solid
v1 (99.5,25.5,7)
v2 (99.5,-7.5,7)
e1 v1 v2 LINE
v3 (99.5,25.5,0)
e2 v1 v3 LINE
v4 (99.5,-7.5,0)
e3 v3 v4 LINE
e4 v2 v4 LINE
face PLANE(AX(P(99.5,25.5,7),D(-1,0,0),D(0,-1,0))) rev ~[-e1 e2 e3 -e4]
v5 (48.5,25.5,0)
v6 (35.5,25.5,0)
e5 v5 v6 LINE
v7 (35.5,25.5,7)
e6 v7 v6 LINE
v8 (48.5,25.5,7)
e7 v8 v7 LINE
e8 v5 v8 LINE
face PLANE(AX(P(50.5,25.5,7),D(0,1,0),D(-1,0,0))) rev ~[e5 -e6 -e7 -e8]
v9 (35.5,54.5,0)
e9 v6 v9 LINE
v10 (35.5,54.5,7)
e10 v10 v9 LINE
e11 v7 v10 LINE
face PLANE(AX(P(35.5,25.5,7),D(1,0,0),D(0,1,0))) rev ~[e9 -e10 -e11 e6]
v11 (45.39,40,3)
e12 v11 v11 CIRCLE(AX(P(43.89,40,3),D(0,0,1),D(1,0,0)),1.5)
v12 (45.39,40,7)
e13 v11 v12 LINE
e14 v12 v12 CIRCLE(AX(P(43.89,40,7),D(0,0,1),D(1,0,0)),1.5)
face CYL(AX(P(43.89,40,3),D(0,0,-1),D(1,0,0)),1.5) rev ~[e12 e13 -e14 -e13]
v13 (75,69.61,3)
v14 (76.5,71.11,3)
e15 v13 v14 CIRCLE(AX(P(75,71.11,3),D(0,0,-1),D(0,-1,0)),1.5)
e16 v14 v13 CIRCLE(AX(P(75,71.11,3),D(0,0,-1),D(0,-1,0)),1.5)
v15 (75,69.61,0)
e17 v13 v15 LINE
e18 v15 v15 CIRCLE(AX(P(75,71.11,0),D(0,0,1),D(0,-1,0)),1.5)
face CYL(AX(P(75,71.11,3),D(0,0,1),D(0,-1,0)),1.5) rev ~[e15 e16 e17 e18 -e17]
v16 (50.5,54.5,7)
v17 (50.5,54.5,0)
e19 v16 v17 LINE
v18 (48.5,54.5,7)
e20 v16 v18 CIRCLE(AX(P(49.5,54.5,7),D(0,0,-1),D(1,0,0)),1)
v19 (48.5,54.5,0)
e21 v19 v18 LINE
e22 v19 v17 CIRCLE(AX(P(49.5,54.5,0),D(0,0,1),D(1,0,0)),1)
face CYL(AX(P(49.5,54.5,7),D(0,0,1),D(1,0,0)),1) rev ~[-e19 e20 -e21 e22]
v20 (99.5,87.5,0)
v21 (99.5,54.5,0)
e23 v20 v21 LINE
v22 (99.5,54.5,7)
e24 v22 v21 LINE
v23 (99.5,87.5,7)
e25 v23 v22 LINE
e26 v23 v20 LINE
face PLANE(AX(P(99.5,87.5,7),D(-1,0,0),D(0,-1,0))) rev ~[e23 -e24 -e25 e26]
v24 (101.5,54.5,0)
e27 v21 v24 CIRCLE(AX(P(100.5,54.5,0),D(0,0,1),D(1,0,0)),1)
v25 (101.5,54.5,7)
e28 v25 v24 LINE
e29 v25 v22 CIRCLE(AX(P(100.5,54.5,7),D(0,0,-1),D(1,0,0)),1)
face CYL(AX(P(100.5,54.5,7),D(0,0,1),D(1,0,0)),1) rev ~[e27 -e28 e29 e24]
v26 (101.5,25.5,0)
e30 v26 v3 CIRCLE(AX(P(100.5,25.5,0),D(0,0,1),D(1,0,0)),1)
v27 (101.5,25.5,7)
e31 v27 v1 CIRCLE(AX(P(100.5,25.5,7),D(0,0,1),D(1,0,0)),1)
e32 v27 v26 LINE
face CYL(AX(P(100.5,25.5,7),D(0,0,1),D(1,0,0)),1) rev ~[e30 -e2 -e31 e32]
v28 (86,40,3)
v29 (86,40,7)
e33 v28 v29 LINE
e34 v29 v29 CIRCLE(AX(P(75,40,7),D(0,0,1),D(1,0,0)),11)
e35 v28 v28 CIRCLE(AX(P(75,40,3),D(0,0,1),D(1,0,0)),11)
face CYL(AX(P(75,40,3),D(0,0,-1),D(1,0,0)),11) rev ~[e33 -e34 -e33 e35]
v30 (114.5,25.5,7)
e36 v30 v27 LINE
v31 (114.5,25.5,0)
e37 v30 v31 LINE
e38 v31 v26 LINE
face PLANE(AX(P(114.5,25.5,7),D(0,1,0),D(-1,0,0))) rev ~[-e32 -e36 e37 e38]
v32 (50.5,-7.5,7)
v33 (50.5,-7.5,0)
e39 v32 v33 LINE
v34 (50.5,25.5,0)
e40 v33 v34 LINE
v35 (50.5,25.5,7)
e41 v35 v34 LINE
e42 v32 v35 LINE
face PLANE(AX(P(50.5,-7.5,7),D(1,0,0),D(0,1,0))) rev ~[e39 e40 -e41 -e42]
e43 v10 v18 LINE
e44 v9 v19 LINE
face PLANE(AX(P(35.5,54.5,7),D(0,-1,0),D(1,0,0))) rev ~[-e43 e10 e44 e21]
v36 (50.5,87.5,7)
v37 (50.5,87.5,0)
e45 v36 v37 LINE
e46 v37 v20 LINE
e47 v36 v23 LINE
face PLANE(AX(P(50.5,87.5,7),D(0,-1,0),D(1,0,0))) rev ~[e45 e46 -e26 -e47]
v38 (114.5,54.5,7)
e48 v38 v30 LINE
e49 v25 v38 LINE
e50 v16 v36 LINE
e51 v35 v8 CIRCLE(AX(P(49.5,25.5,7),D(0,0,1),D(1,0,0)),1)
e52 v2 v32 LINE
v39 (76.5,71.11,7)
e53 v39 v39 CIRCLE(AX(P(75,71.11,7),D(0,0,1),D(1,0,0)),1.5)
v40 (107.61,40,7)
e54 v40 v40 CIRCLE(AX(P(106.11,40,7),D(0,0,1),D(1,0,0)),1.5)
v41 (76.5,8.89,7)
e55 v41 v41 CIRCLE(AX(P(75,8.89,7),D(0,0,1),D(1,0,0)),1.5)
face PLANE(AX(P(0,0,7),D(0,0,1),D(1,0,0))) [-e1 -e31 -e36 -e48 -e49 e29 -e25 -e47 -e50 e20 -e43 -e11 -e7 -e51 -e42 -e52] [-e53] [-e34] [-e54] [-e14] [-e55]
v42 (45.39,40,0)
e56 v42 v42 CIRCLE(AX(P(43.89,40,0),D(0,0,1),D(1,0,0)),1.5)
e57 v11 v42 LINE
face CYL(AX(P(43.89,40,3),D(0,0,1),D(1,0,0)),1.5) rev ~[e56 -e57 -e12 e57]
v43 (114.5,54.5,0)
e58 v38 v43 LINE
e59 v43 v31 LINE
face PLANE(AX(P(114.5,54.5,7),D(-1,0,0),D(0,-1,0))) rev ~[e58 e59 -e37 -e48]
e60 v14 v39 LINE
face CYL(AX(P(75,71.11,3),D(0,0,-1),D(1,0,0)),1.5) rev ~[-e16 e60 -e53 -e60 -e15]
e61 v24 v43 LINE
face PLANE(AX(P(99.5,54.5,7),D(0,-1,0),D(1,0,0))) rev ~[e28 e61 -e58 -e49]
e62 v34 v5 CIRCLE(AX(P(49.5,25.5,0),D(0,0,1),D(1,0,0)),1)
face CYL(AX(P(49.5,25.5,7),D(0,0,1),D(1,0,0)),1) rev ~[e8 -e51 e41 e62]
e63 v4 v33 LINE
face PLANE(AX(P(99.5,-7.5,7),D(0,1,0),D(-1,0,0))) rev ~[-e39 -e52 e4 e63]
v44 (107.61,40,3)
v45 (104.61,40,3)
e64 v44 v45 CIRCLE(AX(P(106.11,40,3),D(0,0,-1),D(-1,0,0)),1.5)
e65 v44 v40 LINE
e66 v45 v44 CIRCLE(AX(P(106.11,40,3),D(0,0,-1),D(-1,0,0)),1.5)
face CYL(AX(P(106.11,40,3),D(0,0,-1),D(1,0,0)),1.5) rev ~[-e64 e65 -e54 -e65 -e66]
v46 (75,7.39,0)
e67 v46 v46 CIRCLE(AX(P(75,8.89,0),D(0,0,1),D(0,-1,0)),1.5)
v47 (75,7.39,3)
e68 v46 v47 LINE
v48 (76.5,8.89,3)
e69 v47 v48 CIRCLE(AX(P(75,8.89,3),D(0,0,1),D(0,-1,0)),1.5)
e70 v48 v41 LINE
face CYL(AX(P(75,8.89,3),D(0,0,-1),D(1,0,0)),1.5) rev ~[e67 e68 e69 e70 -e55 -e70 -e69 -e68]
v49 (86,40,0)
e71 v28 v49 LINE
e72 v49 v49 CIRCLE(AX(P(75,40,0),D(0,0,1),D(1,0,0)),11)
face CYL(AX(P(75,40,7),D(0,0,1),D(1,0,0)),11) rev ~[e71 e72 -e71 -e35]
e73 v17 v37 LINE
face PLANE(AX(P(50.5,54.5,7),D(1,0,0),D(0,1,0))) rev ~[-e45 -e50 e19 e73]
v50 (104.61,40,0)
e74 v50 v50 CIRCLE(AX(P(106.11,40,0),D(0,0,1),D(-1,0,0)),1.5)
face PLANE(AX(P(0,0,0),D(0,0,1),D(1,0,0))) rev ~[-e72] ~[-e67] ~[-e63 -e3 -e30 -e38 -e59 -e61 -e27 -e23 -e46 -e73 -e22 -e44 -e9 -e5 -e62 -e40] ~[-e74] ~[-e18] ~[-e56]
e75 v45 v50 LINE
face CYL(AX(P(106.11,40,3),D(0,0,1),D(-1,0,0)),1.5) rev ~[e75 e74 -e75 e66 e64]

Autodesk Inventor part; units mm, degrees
ref_plane "YZ Plane" through (0, 0, 0) normal (1, 0, 0) x (0, 1, 0)
ref_plane "XZ Plane" through (0, 0, 0) normal (0, 1, 0) x (-1, 0, 0)
ref_plane "XY Plane" through (0, 0, 0) normal (0, 0, 1) x (1, 0, 0)
sketch "Sketch1" plane through (0, 0, 0) normal (0, 0, 1) x (1, 0, 0)
  line L0 (-75, 40) -> (75, 40)
  line L1 (75, 40) -> (75, -40)
  line L2 (75, -40) -> (-75, -40)
  line L3 (-75, -40) -> (-75, 40)
  point P0 (0, 0)
  dimension "d0" = 150
  dimension "d1" = 80
  dimension "d2" = 40
  dimension "d3" = 75
extrude "Vlak" add sketch "Sketch1" along normal blind 3
sketch "Sketch3" plane through (0, 0, 3) normal (0, 0, 1) x (1, 0, 0)
  line L0 (75, 40) -> (75, -40) projected
  line L1 (-75, 40) -> (75, 40) projected
  circle A0 centre (75, 40) radius 10
  point P0 (0, 0)
  dimension "d12" = 20
  dimension "d13" = 0
  dimension "d14" = 0
extrude "Centergat" cut sketch "Sketch3" against normal blind 3
sketch "Sketch4" plane through (0, 0, 3) normal (0, 0, 1) x (1, 0, 0)
  line L0 (-75, 40) -> (65, 40) projected
  line L1 (75, -40) -> (-75, -40) projected
  line L2 (18.8539, 53.8539) -> (-131.8943, -96.8943) construction
  circle A0 centre (-155, -120) radius 150
  point P0 (0, 0)
  dimension "d17" = 0
  dimension "d18" = 45
  dimension "d19" = 300
  dimension "d20" = 0
  dimension "d21" = 160
extrude "PropellorSpace" cut sketch "Sketch4" against normal blind 3
sketch "Sketch5" plane through (0, 0, 3) normal (0, 0, 1) x (1, 0, 0)
  arc A0 (-28.1142, -40) -> (-75, 6.8858) centre (-155, -120) ccw projected
  line L0 (75, -40) -> (-28.1142, -40) projected
  line L1 (-75, 40) -> (65, 40) projected
  line L2 (-155, -120) -> (34.1296, 69.1296) construction
  line L3 (-168.3606, -98.0053) -> (-8.8118, 61.5435) construction
  line L4 (-132.6124, -132.9677) -> (63.849, 63.4937) construction
  line L5 (-208.1378, -57.7825) -> (-104.1378, -161.7825) construction
  line L6 (-25.5995, -23.1264) -> (-11.4573, -8.9842)
  line L7 (-11.4573, -8.9842) -> (-8.6289, -11.8127)
  line L8 (-8.6289, -11.8127) -> (-22.771, -25.9548)
  line L9 (-22.771, -25.9548) -> (-25.5995, -23.1264)
  line L10 (-60.9548, 12.229) -> (-46.8127, 26.3711)
  line L11 (-46.8127, 26.3711) -> (-43.9842, 23.5427)
  line L12 (-43.9842, 23.5427) -> (-58.1264, 9.4005)
  line L13 (-58.1264, 9.4005) -> (-60.9548, 12.229)
  line L14 (13.2914, 15.7645) -> (27.4335, 29.9066)
  line L15 (27.4335, 29.9066) -> (30.262, 27.0782)
  line L16 (30.262, 27.0782) -> (16.1198, 12.9361)
  line L17 (16.1198, 12.9361) -> (13.2914, 15.7645)
  line L18 (-62.0184, 71.663) -> (40.1093, -30.4647) construction
  line L19 (-7.9217, 14.7379) -> (-22.0638, 28.88)
  line L20 (-22.0638, 28.88) -> (-19.2354, 31.7085)
  line L21 (-19.2354, 31.7085) -> (-5.0932, 17.5663)
  line L22 (-5.0932, 17.5663) -> (-7.9217, 14.7379)
  point P0 (0, 0)
  point P1 (-168.1378, -97.7825)
  point P2 (-132.7825, -133.1378)
  point P3 (-30.3553, 40)
  dimension "d24" = 45
  dimension "d25" = 0
  dimension "d26" = 90
  dimension "d27" = 25
  dimension "d28" = 25
  dimension "d29" = 0
  dimension "d30" = 0
  dimension "d31" = 0
  dimension "d32" = 20
  dimension "d33" = 4
  dimension "d34" = 20
  dimension "d35" = 4
  dimension "d36" = 0
  dimension "d37" = 2
  dimension "d38" = 0
  dimension "d39" = 2
  dimension "d40" = 160
  dimension "d41" = 160
  dimension "d44" = 55
  dimension "d49" = 45
  dimension "d50" = 0
  dimension "d51" = 0
  dimension "d52" = 0
  dimension "d53" = 21.2742
  dimension "d54" = 20
  dimension "d55" = 4
  dimension "d56" = 0
  dimension "d57" = 2
  dimension "d58" = 13.726
extrude "Armsteunen" cut sketch "Sketch5" against normal blind 3
sketch "Sketch6" plane through (0, 0, 3) normal (0, 0, 1) x (1, 0, 0)
  line L0 (75, -40) -> (-28.1142, -40) projected
  line L1 (75, 30) -> (75, -40) projected
  line L2 (-75, 40) -> (65, 40) projected
  line L3 (-75, 6.8858) -> (-75, 40) projected
  circle A0 centre (55, -20) radius 1.5
  circle A1 centre (15, -20) radius 1.5
  circle A2 centre (-13.9878, -20) radius 1.5
  circle A3 centre (-34.4939, 0.5061) radius 1.5
  circle A4 centre (43.89, 40) radius 1.5
  circle A5 centre (26.0122, 20) radius 1.5
  circle A6 centre (5, 40) radius 1.5
  circle A7 centre (-55, 21.0122) radius 1.5
  circle A8 centre (-55, 30) radius 1.5
  line L4 (-55, 21.0122) -> (-13.9878, -20) construction
  line L5 (-34.4939, 0.5061) -> (12.7873, 47.7873) construction
  circle A9 centre (-40.4428, 35) radius 1.5
  circle A10 centre (3.6899, -2.3223) radius 1.5
  circle A11 centre (-16.8162, 18.1838) radius 1.5
  arc A12 (65, 40) -> (75, 30) centre (75, 40) ccw projected
  circle A13 centre (75, 8.89) radius 1.5
  point P0 (0, 0)
  point P1 (-43.9842, 23.5427)
  point P2 (-11.4573, -8.9842)
  dimension "d61" = 3
  dimension "d62" = 3
  dimension "d63" = 3
  dimension "d64" = 3
  dimension "d65" = 3
  dimension "d66" = 3
  dimension "d67" = 3
  dimension "d68" = 3
  dimension "d69" = 3
  dimension "d70" = 20
  dimension "d71" = 20
  dimension "d72" = 20
  dimension "d73" = 60
  dimension "d75" = 20
  dimension "d76" = 31.11
  dimension "d77" = 0
  dimension "d78" = 20
  dimension "d80" = 10
  dimension "d82" = 20
  dimension "d83" = 20
  dimension "d84" = 0
  dimension "d87" = 45
  dimension "d88" = 0
  dimension "d89" = 0
  dimension "d90" = 3
  dimension "d101" = 3
  dimension "d103" = 29
  dimension "d106" = 3
  dimension "d107" = 0
  dimension "d111" = 3
  dimension "d112" = 0
  dimension "d113" = 31.11
  dimension "d166" = 29
  dimension "d167" = 23
  dimension "d168" = 23
  dimension "d169" = 29
  dimension "d170" = 25
  dimension "d171" = 25
  dimension "d172" = 29
  dimension "d175" = 29
  dimension "d179" = 5
  dimension "d182" = 43.9962
extrude "Holes" cut sketch "Sketch6" against normal blind 3
sketch "Sketch10" plane through (0, 0, 3) normal (0, 0, 1) x (1, 0, 0)
  line L0 (45.39, 40) -> (65, 40) projected
  line L1 (6.5, 40) -> (42.39, 40) projected
  line L2 (75, 7.39) -> (75, -40) projected
  line L3 (45, -8) -> (65, -8)
  line L4 (65, -8) -> (65, -12)
  line L5 (65, -12) -> (45, -12)
  line L6 (45, -12) -> (45, -8)
  line L7 (31, 30) -> (35, 30)
  line L8 (35, 30) -> (35, 10)
  line L9 (35, 10) -> (31, 10)
  line L10 (31, 10) -> (31, 30)
  line L11 (5, -8) -> (25, -8)
  line L12 (25, -8) -> (25, -12)
  line L13 (25, -12) -> (5, -12)
  line L14 (5, -12) -> (5, -8)
  point P0 (0, 0)
  point P1 (-8.6289, -11.8127)
  dimension "d114" = 20
  dimension "d115" = 4
  dimension "d116" = 4
  dimension "d117" = 20
  dimension "d118" = 10
  dimension "d119" = 48
  dimension "d120" = 40
  dimension "d121" = 10
  dimension "d124" = 40
  dimension "d164" = 13.6289
  dimension "d165" = 10
extrude "InternalStructure" cut sketch "Sketch10" against normal blind 3
sketch "Sketch11" plane through (0, 0, 3) normal (0, 0, 1) x (1, 0, 0)
  line L0 (25, -8) -> (25, -12) projected
  line L1 (-25.5995, -23.1264) -> (-11.4573, -8.9842) projected
  circle A0 centre (15, -20) radius 1.5 projected
  circle A1 centre (-34.4939, 0.5061) radius 1.5 projected
  line L2 (6.5, 40) -> (42.39, 40) projected
  line L3 (75, 7.39) -> (75, -40) projected
  line L4 (40, 25) -> (50, 25)
  line L5 (50, 25) -> (50, 0)
  line L6 (50, 0) -> (40, 0)
  line L7 (40, 0) -> (40, 25)
  line L8 (25, -15) -> (45, -15)
  line L9 (45, -15) -> (45, -25)
  line L10 (45, -25) -> (25, -25)
  line L11 (25, -25) -> (25, -15)
  line L12 (-24.6985, 17.3726) -> (-17.6274, 10.3015)
  line L13 (-17.6274, 10.3015) -> (-28.234, -0.3051)
  line L14 (-28.234, -0.3051) -> (-35.3051, 6.766)
  line L15 (-35.3051, 6.766) -> (-24.6985, 17.3726)
  line L16 (-7.9217, 14.7379) -> (-22.0638, 28.88) projected
  point P0 (0, 0)
  dimension "d134" = 10
  dimension "d135" = 25
  dimension "d136" = 25
  dimension "d137" = 15
  dimension "d138" = 20
  dimension "d139" = 10
  dimension "d140" = 0
  dimension "d141" = 5
  dimension "d142" = 10
  dimension "d144" = 0
  dimension "d145" = 5
  dimension "d180" = 10
  dimension "d181" = 15
extrude "CablingHoles" cut sketch "Sketch11" against normal blind 3 contours L4 L5 L6 L7 | L8 L9 L10 L11 | L12 L13 L14 L15
sketch "Sketch12" plane through (0, 0, 3) normal (0, 0, 1) x (1, 0, 0)
  line L0 (75, -40) -> (-28.1142, -40) projected
  line L1 (75, 7.39) -> (75, -40) projected
  arc A0 (75, -26.5) -> (-28.1142, -40) centre (76.1332, -435.7032) ccw
  line L2 (45, -25) -> (25, -25) projected
  line L3 (5, -8) -> (25, -8) projected
  line L4 (35, 30) -> (35, -49) construction
  line L5 (65, -8) -> (-10, -8) construction
  circle A1 centre (29, -5) radius 1.5
  circle A2 centre (38, -5) radius 1.5
  line L6 (16.1198, 12.9361) -> (13.2914, 15.7645) projected
  line L7 (-7.9217, 14.7379) -> (-22.0638, 28.88) projected
  line L8 (-22.0638, 28.88) -> (-19.2354, 31.7085) projected
  line L9 (-19.2354, 31.7085) -> (-5.0932, 17.5663) projected
  line L10 (-46.8127, 26.3711) -> (-43.9842, 23.5427) projected
  line L11 (-43.9842, 23.5427) -> (-58.1264, 9.4005) projected
  point P0 (0, 0)
  dimension "d149" = 13.5
  dimension "d150" = 103.1142
  dimension "d151" = 40
  dimension "d156" = 3
  dimension "d157" = 3
  dimension "d158" = 3
  dimension "d159" = 3
  dimension "d160" = 6
  dimension "d161" = 3
  dimension "d176" = 11.7258
  dimension "d177" = 11.726
  dimension "d178" = 19.2742
extrude "BodyReshape" cut sketch "Sketch12" against normal blind 3
sketch "Sketch14" plane through (0, 0, 3) normal (0, 0, 1) x (1, 0, 0)
  arc A0 (75, -26.5) -> (-28.1142, -40) centre (76.1332, -435.7032) ccw projected
  line L0 (75, 7.39) -> (75, -26.5) projected
  arc A1 (75, 10.39) -> (75, 7.39) centre (75, 8.89) ccw projected
  line L1 (75, 30) -> (75, 10.39) projected
  arc A2 (65, 40) -> (75, 30) centre (75, 40) ccw projected
  line L2 (45.39, 40) -> (65, 40) projected
  arc A3 (42.39, 40) -> (45.39, 40) centre (43.89, 40) ccw projected
  line L3 (6.5, 40) -> (42.39, 40) projected
  arc A4 (3.5, 40) -> (6.5, 40) centre (5, 40) ccw projected
  line L4 (-75, 40) -> (3.5, 40) projected
  arc A5 (-28.1142, -40) -> (-75, 6.8858) centre (-155, -120) ccw projected
  circle A6 centre (-55, 21.0122) radius 1.5 projected
  circle A7 centre (-34.4939, 0.5061) radius 1.5 projected
  circle A8 centre (-13.9878, -20) radius 1.5 projected
  circle A9 centre (55, -20) radius 1.5 projected
  circle A10 centre (-16.8162, 18.1838) radius 1.5 projected
  circle A11 centre (3.6899, -2.3223) radius 1.5 projected
  circle A12 centre (-55, 30) radius 1.5 projected
  circle A13 centre (15, -20) radius 1.5 projected
  circle A14 centre (26.0122, 20) radius 1.5 projected
  circle A15 centre (-40.4428, 35) radius 1.5 projected
  circle A16 centre (29, -5) radius 1.5 projected
  circle A17 centre (38, -5) radius 1.5 projected
  arc A18 (178.1142, -40) -> (75, -26.5) centre (73.8668, -435.7032) ccw
  arc A19 (75, 7.39) -> (75, 10.39) centre (75, 8.89) ccw
  arc A20 (75, 30) -> (85, 40) centre (75, 40) ccw
  line L5 (104.61, 40) -> (85, 40)
  arc A21 (104.61, 40) -> (107.61, 40) centre (106.11, 40) ccw
  line L6 (143.5, 40) -> (107.61, 40)
  arc A22 (143.5, 40) -> (146.5, 40) centre (145, 40) ccw
  line L7 (225, 40) -> (146.5, 40)
  line L8 (225, 6.8858) -> (225, 40)
  arc A23 (225, 6.8858) -> (178.1142, -40) centre (305, -120) ccw
  circle A24 centre (205, 21.0122) radius 1.5
  circle A25 centre (184.4939, 0.5061) radius 1.5
  circle A26 centre (163.9878, -20) radius 1.5
  circle A27 centre (95, -20) radius 1.5
  circle A28 centre (166.8162, 18.1838) radius 1.5
  circle A29 centre (146.3101, -2.3223) radius 1.5
  circle A30 centre (205, 30) radius 1.5
  circle A31 centre (135, -20) radius 1.5
  circle A32 centre (123.9878, 20) radius 1.5
  circle A33 centre (190.4428, 35) radius 1.5
  line L9 (208.1264, 9.4005) -> (210.9548, 12.229)
  line L10 (210.9548, 12.229) -> (196.8127, 26.3711)
  line L11 (196.8127, 26.3711) -> (193.9842, 23.5427)
  line L12 (193.9842, 23.5427) -> (208.1264, 9.4005)
  line L13 (155.0932, 17.5663) -> (157.9217, 14.7379)
  line L14 (157.9217, 14.7379) -> (172.0638, 28.88)
  line L15 (172.0638, 28.88) -> (169.2354, 31.7085)
  line L16 (169.2354, 31.7085) -> (155.0932, 17.5663)
  line L17 (172.771, -25.9548) -> (175.5995, -23.1264)
  line L18 (175.5995, -23.1264) -> (161.4573, -8.9842)
  line L19 (161.4573, -8.9842) -> (158.6289, -11.8127)
  line L20 (158.6289, -11.8127) -> (172.771, -25.9548)
  line L21 (136.7086, 15.7645) -> (122.5665, 29.9066)
  line L22 (122.5665, 29.9066) -> (119.738, 27.0782)
  line L23 (119.738, 27.0782) -> (133.8802, 12.9361)
  line L24 (133.8802, 12.9361) -> (136.7086, 15.7645)
  line L25 (105, -12) -> (105, -8)
  line L26 (105, -8) -> (85, -8)
  line L27 (85, -8) -> (85, -12)
  line L28 (85, -12) -> (105, -12)
  line L29 (145, -12) -> (145, -8)
  line L30 (145, -8) -> (125, -8)
  line L31 (125, -8) -> (125, -12)
  line L32 (125, -12) -> (145, -12)
  line L33 (119, 10) -> (119, 30)
  line L34 (119, 30) -> (115, 30)
  line L35 (115, 30) -> (115, 10)
  line L36 (115, 10) -> (119, 10)
  line L37 (185.3051, 6.766) -> (174.6985, 17.3726)
  line L38 (174.6985, 17.3726) -> (167.6274, 10.3015)
  line L39 (167.6274, 10.3015) -> (178.234, -0.3051)
  line L40 (178.234, -0.3051) -> (185.3051, 6.766)
  line L41 (110, 0) -> (110, 25)
  line L42 (110, 25) -> (100, 25)
  line L43 (100, 25) -> (100, 0)
  line L44 (100, 0) -> (110, 0)
  line L45 (125, -25) -> (125, -15)
  line L46 (125, -15) -> (105, -15)
  line L47 (105, -15) -> (105, -25)
  line L48 (105, -25) -> (125, -25)
  circle A34 centre (121, -5) radius 1.5
  circle A35 centre (112, -5) radius 1.5
  arc A36 (-28.1142, 120) -> (75, 106.5) centre (76.1332, 515.7032) ccw
  line L49 (75, 72.61) -> (75, 106.5)
  arc A37 (75, 72.61) -> (75, 69.61) centre (75, 71.11) ccw
  line L50 (75, 50) -> (75, 69.61)
  arc A38 (75, 50) -> (65, 40) centre (75, 40) ccw
  arc A39 (45.39, 40) -> (42.39, 40) centre (43.89, 40) ccw
  arc A40 (6.5, 40) -> (3.5, 40) centre (5, 40) ccw
  line L51 (-75, 73.1142) -> (-75, 40)
  arc A41 (-75, 73.1142) -> (-28.1142, 120) centre (-155, 200) ccw
  circle A42 centre (-55, 58.9878) radius 1.5
  circle A43 centre (-34.4939, 79.4939) radius 1.5
  circle A44 centre (-13.9878, 100) radius 1.5
  circle A45 centre (55, 100) radius 1.5
  circle A46 centre (-16.8162, 61.8162) radius 1.5
  circle A47 centre (3.6899, 82.3223) radius 1.5
  circle A48 centre (-55, 50) radius 1.5
  circle A49 centre (15, 100) radius 1.5
  circle A50 centre (26.0122, 60) radius 1.5
  circle A51 centre (-40.4428, 45) radius 1.5
  line L52 (-58.1264, 70.5995) -> (-60.9548, 67.771)
  line L53 (-60.9548, 67.771) -> (-46.8127, 53.6289)
  line L54 (-46.8127, 53.6289) -> (-43.9842, 56.4573)
  line L55 (-43.9842, 56.4573) -> (-58.1264, 70.5995)
  line L56 (-5.0932, 62.4337) -> (-7.9217, 65.2621)
  line L57 (-7.9217, 65.2621) -> (-22.0638, 51.12)
  line L58 (-22.0638, 51.12) -> (-19.2354, 48.2915)
  line L59 (-19.2354, 48.2915) -> (-5.0932, 62.4337)
  line L60 (-22.771, 105.9548) -> (-25.5995, 103.1264)
  line L61 (-25.5995, 103.1264) -> (-11.4573, 88.9842)
  line L62 (-11.4573, 88.9842) -> (-8.6289, 91.8127)
  line L63 (-8.6289, 91.8127) -> (-22.771, 105.9548)
  line L64 (13.2914, 64.2355) -> (27.4335, 50.0934)
  line L65 (27.4335, 50.0934) -> (30.262, 52.9218)
  line L66 (30.262, 52.9218) -> (16.1198, 67.0639)
  line L67 (16.1198, 67.0639) -> (13.2914, 64.2355)
  line L68 (45, 92) -> (45, 88)
  line L69 (45, 88) -> (65, 88)
  line L70 (65, 88) -> (65, 92)
  line L71 (65, 92) -> (45, 92)
  line L72 (5, 92) -> (5, 88)
  line L73 (5, 88) -> (25, 88)
  line L74 (25, 88) -> (25, 92)
  line L75 (25, 92) -> (5, 92)
  line L76 (31, 70) -> (31, 50)
  line L77 (31, 50) -> (35, 50)
  line L78 (35, 50) -> (35, 70)
  line L79 (35, 70) -> (31, 70)
  line L80 (-35.3051, 73.234) -> (-24.6985, 62.6274)
  line L81 (-24.6985, 62.6274) -> (-17.6274, 69.6985)
  line L82 (-17.6274, 69.6985) -> (-28.234, 80.3051)
  line L83 (-28.234, 80.3051) -> (-35.3051, 73.234)
  line L84 (40, 80) -> (40, 55)
  line L85 (40, 55) -> (50, 55)
  line L86 (50, 55) -> (50, 80)
  line L87 (50, 80) -> (40, 80)
  line L88 (25, 105) -> (25, 95)
  line L89 (25, 95) -> (45, 95)
  line L90 (45, 95) -> (45, 105)
  line L91 (45, 105) -> (25, 105)
  circle A52 centre (29, 85) radius 1.5
  circle A53 centre (38, 85) radius 1.5
  line L92 (100, 80) -> (110, 80)
  line L93 (115, 70) -> (119, 70)
  line L94 (100, 55) -> (100, 80)
  line L95 (110, 55) -> (100, 55)
  line L96 (119, 70) -> (119, 50)
  line L97 (119, 50) -> (115, 50)
  line L98 (115, 50) -> (115, 70)
  arc A54 (75, 69.61) -> (75, 72.61) centre (75, 71.11) ccw
  arc A55 (85, 40) -> (75, 50) centre (75, 40) ccw
  line L99 (110, 80) -> (110, 55)
  line L100 (178.234, 80.3051) -> (185.3051, 73.234)
  line L101 (167.6274, 69.6985) -> (178.234, 80.3051)
  arc A56 (178.1142, 120) -> (225, 73.1142) centre (305, 200) ccw
  circle A57 centre (184.4939, 79.4939) radius 1.5
  line L102 (161.4573, 88.9842) -> (158.6289, 91.8127)
  line L103 (175.5995, 103.1264) -> (161.4573, 88.9842)
  line L104 (158.6289, 91.8127) -> (172.771, 105.9548)
  line L105 (172.771, 105.9548) -> (175.5995, 103.1264)
  circle A58 centre (163.9878, 100) radius 1.5
  line L106 (105, 88) -> (85, 88)
  line L107 (85, 88) -> (85, 92)
  line L108 (85, 92) -> (105, 92)
  circle A59 centre (95, 100) radius 1.5
  line L109 (174.6985, 62.6274) -> (167.6274, 69.6985)
  line L110 (185.3051, 73.234) -> (174.6985, 62.6274)
  circle A60 centre (166.8162, 61.8162) radius 1.5
  line L111 (208.1264, 70.5995) -> (210.9548, 67.771)
  line L112 (196.8127, 53.6289) -> (193.9842, 56.4573)
  line L113 (193.9842, 56.4573) -> (208.1264, 70.5995)
  circle A61 centre (205, 58.9878) radius 1.5
  line L114 (210.9548, 67.771) -> (196.8127, 53.6289)
  circle A62 centre (190.4428, 45) radius 1.5
  line L115 (155.0932, 62.4337) -> (157.9217, 65.2621)
  line L116 (172.0638, 51.12) -> (169.2354, 48.2915)
  line L117 (157.9217, 65.2621) -> (172.0638, 51.12)
  line L118 (169.2354, 48.2915) -> (155.0932, 62.4337)
  circle A63 centre (205, 50) radius 1.5
  line L119 (225, 73.1142) -> (225, 40)
  circle A64 centre (112, 85) radius 1.5
  line L120 (105, 92) -> (105, 88)
  circle A65 centre (121, 85) radius 1.5
  line L121 (125, 88) -> (125, 92)
  line L122 (125, 95) -> (105, 95)
  line L123 (105, 95) -> (105, 105)
  line L124 (125, 105) -> (125, 95)
  line L125 (105, 105) -> (125, 105)
  arc A66 (75, 106.5) -> (178.1142, 120) centre (73.8668, 515.7032) ccw
  arc A67 (107.61, 40) -> (104.61, 40) centre (106.11, 40) ccw
  arc A68 (146.5, 40) -> (143.5, 40) centre (145, 40) ccw
  line L126 (133.8802, 67.0639) -> (136.7086, 64.2355)
  line L127 (136.7086, 64.2355) -> (122.5665, 50.0934)
  line L128 (122.5665, 50.0934) -> (119.738, 52.9218)
  line L129 (119.738, 52.9218) -> (133.8802, 67.0639)
  circle A69 centre (123.9878, 60) radius 1.5
  line L130 (145, 92) -> (145, 88)
  line L131 (145, 88) -> (125, 88)
  line L132 (125, 92) -> (145, 92)
  circle A70 centre (135, 100) radius 1.5
  circle A71 centre (146.3101, 82.3223) radius 1.5
  point P0 (-58.1264, 9.4005)
  point P1 (-60.9548, 12.229)
  point P2 (-46.8127, 26.3711)
  point P3 (-43.9842, 23.5427)
  point P4 (-5.0932, 17.5663)
  point P5 (-7.9217, 14.7379)
  point P6 (-22.0638, 28.88)
  point P7 (-19.2354, 31.7085)
  point P8 (-22.771, -25.9548)
  point P9 (-25.5995, -23.1264)
  point P10 (-11.4573, -8.9842)
  point P11 (-8.6289, -11.8127)
  point P12 (13.2914, 15.7645)
  point P13 (27.4335, 29.9066)
  point P14 (30.262, 27.0782)
  point P15 (16.1198, 12.9361)
  point P16 (45, -12)
  point P17 (45, -8)
  point P18 (65, -8)
  point P19 (65, -12)
  point P20 (5, -12)
  point P21 (5, -8)
  point P22 (25, -8)
  point P23 (25, -12)
  point P24 (31, 10)
  point P25 (31, 30)
  point P26 (35, 30)
  point P27 (35, 10)
  point P28 (-35.3051, 6.766)
  point P29 (-24.6985, 17.3726)
  point P30 (-17.6274, 10.3015)
  point P31 (-28.234, -0.3051)
  point P32 (40, 0)
  point P33 (40, 25)
  point P34 (50, 25)
  point P35 (50, 0)
  point P36 (25, -25)
  point P37 (25, -15)
  point P38 (45, -15)
  point P39 (45, -25)
  point P40 (0, 0)
  point P41 (150, 0)
  point P42 (0, 80)
  point P43 (150, 80)
extrude "Mirroring" add sketch "Sketch14" against normal blind 3 contours A19 L1 A20 L5 A21 L6 A22 L7 L8 A23 A18 L0 | L2 A39 L3 A40 L4 L51 A41 A36 L49 A37 L50 A38 | A55 L50 A54 L49 A66 A56 L119 L7 A68 L6 A67 L5
sketch "Sketch15" plane through (0, 0, 3) normal (0, 0, 1) x (1, 0, 0)
  circle A0 centre (75, 40) radius 10 projected
  circle A1 centre (75, 8.89) radius 1.5 projected
  circle A2 centre (75, 71.11) radius 1.5 projected
  circle A3 centre (106.11, 40) radius 1.5 projected
  line L0 (115, 50) -> (115, 70) projected
  line L1 (110, 55) -> (100, 55) projected
  line L2 (35, 70) -> (35, 50) projected
  line L3 (115, 10) -> (115, 30) projected
  circle A4 centre (43.89, 40) radius 1.5 projected
  line L4 (35, 30) -> (35, 10) projected
  line L5 (100, 80) -> (100, 55)
  line L6 (115, 55) -> (100, 55)
  line L7 (100, 25) -> (115, 25)
  line L8 (115, 25) -> (115, 55)
  line L9 (100, 25) -> (100, 0)
  line L10 (50, 0) -> (50, 25)
  line L11 (50, 25) -> (35, 25)
  line L12 (50, 80) -> (50, 55)
  line L13 (50, 55) -> (35, 55)
  line L14 (35, 55) -> (35, 25)
  line L15 (105, 88) -> (85, 88) projected
  line L16 (65, 88) -> (45, 88) projected
  line L17 (85, -8) -> (105, -8) projected
  line L18 (45, -8) -> (65, -8) projected
  line L19 (45, -15) -> (45, -25) projected
  line L20 (50, 55) -> (50, 88)
  line L21 (100, 55) -> (100, 88)
  line L22 (50, 88) -> (100, 88)
  line L23 (100, 25) -> (100, -8)
  line L24 (50, 25) -> (50, -8)
  line L25 (50, -8) -> (100, -8)
  circle A5 centre (75, 40) radius 11
  point P0 (0, 0)
  dimension "d201" = 1
extrude "MarkBoardShape" add sketch "Sketch15" along normal blind 4 contours L8 L3 L7 L9 L23 L17 L25 L18 L24 L10 L11 L4 L14 L2 L13 L12 L20 L16 L22 L15 L21 L5 L1 L6 L0
sketch "Sketch19" plane through (0, 0, 3) normal (0, 0, 1) x (1, 0, 0)
  circle A0 centre (38, -5) radius 1.5 projected
  circle A1 centre (29, -5) radius 1.5 projected
  line L0 (25, -25) -> (25, -15) projected
  line L1 (25, -15) -> (45, -15) projected
  line L2 (45, -15) -> (45, -25) projected
  line L3 (45, -25) -> (25, -25) projected
  line L4 (-35.3051, 6.766) -> (-24.6985, 17.3726) projected
  line L5 (-24.6985, 17.3726) -> (-17.6274, 10.3015) projected
  line L6 (-17.6274, 10.3015) -> (-28.234, -0.3051) projected
  line L7 (-28.234, -0.3051) -> (-35.3051, 6.766) projected
  line L8 (5, -12) -> (5, -8) projected
  line L9 (5, -8) -> (25, -8) projected
  line L10 (25, -8) -> (25, -12) projected
  line L11 (25, -12) -> (5, -12) projected
  line L12 (13.2914, 15.7645) -> (27.4335, 29.9066) projected
  line L13 (27.4335, 29.9066) -> (30.262, 27.0782) projected
  line L14 (30.262, 27.0782) -> (16.1198, 12.9361) projected
  line L15 (16.1198, 12.9361) -> (13.2914, 15.7645) projected
  line L16 (-22.771, -25.9548) -> (-25.5995, -23.1264) projected
  line L17 (-25.5995, -23.1264) -> (-11.4573, -8.9842) projected
  line L18 (-11.4573, -8.9842) -> (-8.6289, -11.8127) projected
  line L19 (-8.6289, -11.8127) -> (-22.771, -25.9548) projected
  line L20 (-5.0932, 17.5663) -> (-7.9217, 14.7379) projected
  line L21 (-7.9217, 14.7379) -> (-22.0638, 28.88) projected
  line L22 (-22.0638, 28.88) -> (-19.2354, 31.7085) projected
  line L23 (-19.2354, 31.7085) -> (-5.0932, 17.5663) projected
  line L24 (-58.1264, 9.4005) -> (-60.9548, 12.229) projected
  line L25 (-60.9548, 12.229) -> (-46.8127, 26.3711) projected
  line L26 (-46.8127, 26.3711) -> (-43.9842, 23.5427) projected
  line L27 (-43.9842, 23.5427) -> (-58.1264, 9.4005) projected
  circle A2 centre (-40.4428, 35) radius 1.5 projected
  circle A3 centre (26.0122, 20) radius 1.5 projected
  circle A4 centre (15, -20) radius 1.5 projected
  circle A5 centre (-55, 30) radius 1.5 projected
  circle A6 centre (3.6899, -2.3223) radius 1.5 projected
  circle A7 centre (-16.8162, 18.1838) radius 1.5 projected
  circle A8 centre (55, -20) radius 1.5 projected
  circle A9 centre (-13.9878, -20) radius 1.5 projected
  circle A10 centre (-34.4939, 0.5061) radius 1.5 projected
  circle A11 centre (-55, 21.0122) radius 1.5 projected
  line L28 (105, -15) -> (125, -15) projected
  line L29 (125, -15) -> (125, -25) projected
  line L30 (125, -25) -> (105, -25) projected
  line L31 (105, -25) -> (105, -15) projected
  line L32 (167.6274, 10.3015) -> (174.6985, 17.3726) projected
  line L33 (174.6985, 17.3726) -> (185.3051, 6.766) projected
  line L34 (185.3051, 6.766) -> (178.234, -0.3051) projected
  line L35 (178.234, -0.3051) -> (167.6274, 10.3015) projected
  line L36 (196.8127, 26.3711) -> (210.9548, 12.229) projected
  line L37 (210.9548, 12.229) -> (208.1264, 9.4005) projected
  line L38 (208.1264, 9.4005) -> (193.9842, 23.5427) projected
  line L39 (193.9842, 23.5427) -> (196.8127, 26.3711) projected
  line L40 (119.738, 27.0782) -> (122.5665, 29.9066) projected
  line L41 (122.5665, 29.9066) -> (136.7086, 15.7645) projected
  line L42 (136.7086, 15.7645) -> (133.8802, 12.9361) projected
  line L43 (133.8802, 12.9361) -> (119.738, 27.0782) projected
  line L44 (125, -12) -> (125, -8) projected
  line L45 (125, -8) -> (145, -8) projected
  line L46 (145, -8) -> (145, -12) projected
  line L47 (145, -12) -> (125, -12) projected
  line L48 (161.4573, -8.9842) -> (175.5995, -23.1264) projected
  line L49 (175.5995, -23.1264) -> (172.771, -25.9548) projected
  line L50 (172.771, -25.9548) -> (158.6289, -11.8127) projected
  line L51 (158.6289, -11.8127) -> (161.4573, -8.9842) projected
  line L52 (172.0638, 28.88) -> (157.9217, 14.7379) projected
  line L53 (157.9217, 14.7379) -> (155.0932, 17.5663) projected
  line L54 (155.0932, 17.5663) -> (169.2354, 31.7085) projected
  line L55 (169.2354, 31.7085) -> (172.0638, 28.88) projected
  circle A12 centre (205, 21.0122) radius 1.5 projected
  circle A13 centre (163.9878, -20) radius 1.5 projected
  circle A14 centre (184.4939, 0.5061) radius 1.5 projected
  circle A15 centre (95, -20) radius 1.5 projected
  circle A16 centre (112, -5) radius 1.5 projected
  circle A17 centre (166.8162, 18.1838) radius 1.5 projected
  circle A18 centre (146.3101, -2.3223) radius 1.5 projected
  circle A19 centre (135, -20) radius 1.5 projected
  circle A20 centre (205, 30) radius 1.5 projected
  circle A21 centre (121, -5) radius 1.5 projected
  circle A22 centre (123.9878, 20) radius 1.5 projected
  circle A23 centre (190.4428, 35) radius 1.5 projected
  line L56 (45, 105) -> (45, 95) projected
  line L57 (45, 95) -> (25, 95) projected
  line L58 (25, 95) -> (25, 105) projected
  line L59 (25, 105) -> (45, 105) projected
  line L60 (-28.234, 80.3051) -> (-17.6274, 69.6985) projected
  line L61 (-17.6274, 69.6985) -> (-24.6985, 62.6274) projected
  line L62 (-24.6985, 62.6274) -> (-35.3051, 73.234) projected
  line L63 (-35.3051, 73.234) -> (-28.234, 80.3051) projected
  line L64 (-46.8127, 53.6289) -> (-60.9548, 67.771) projected
  line L65 (-60.9548, 67.771) -> (-58.1264, 70.5995) projected
  line L66 (-58.1264, 70.5995) -> (-43.9842, 56.4573) projected
  line L67 (-43.9842, 56.4573) -> (-46.8127, 53.6289) projected
  line L68 (-8.6289, 91.8127) -> (-11.4573, 88.9842) projected
  line L69 (-11.4573, 88.9842) -> (-25.5995, 103.1264) projected
  line L70 (-25.5995, 103.1264) -> (-22.771, 105.9548) projected
  line L71 (-22.771, 105.9548) -> (-8.6289, 91.8127) projected
  line L72 (-22.0638, 51.12) -> (-7.9217, 65.2621) projected
  line L73 (-7.9217, 65.2621) -> (-5.0932, 62.4337) projected
  line L74 (-5.0932, 62.4337) -> (-19.2354, 48.2915) projected
  line L75 (-19.2354, 48.2915) -> (-22.0638, 51.12) projected
  line L76 (13.2914, 64.2355) -> (16.1198, 67.0639) projected
  line L77 (16.1198, 67.0639) -> (30.262, 52.9218) projected
  line L78 (30.262, 52.9218) -> (27.4335, 50.0934) projected
  line L79 (27.4335, 50.0934) -> (13.2914, 64.2355) projected
  line L80 (25, 88) -> (5, 88) projected
  line L81 (5, 88) -> (5, 92) projected
  line L82 (5, 92) -> (25, 92) projected
  line L83 (25, 92) -> (25, 88) projected
  circle A24 centre (-55, 58.9878) radius 1.5 projected
  circle A25 centre (-13.9878, 100) radius 1.5 projected
  circle A26 centre (-34.4939, 79.4939) radius 1.5 projected
  circle A27 centre (55, 100) radius 1.5 projected
  circle A28 centre (-16.8162, 61.8162) radius 1.5 projected
  circle A29 centre (38, 85) radius 1.5 projected
  circle A30 centre (3.6899, 82.3223) radius 1.5 projected
  circle A31 centre (-55, 50) radius 1.5 projected
  circle A32 centre (15, 100) radius 1.5 projected
  circle A33 centre (29, 85) radius 1.5 projected
  circle A34 centre (26.0122, 60) radius 1.5 projected
  circle A35 centre (-40.4428, 45) radius 1.5 projected
  line L84 (105, 105) -> (125, 105) projected
  line L85 (125, 105) -> (125, 95) projected
  line L86 (125, 95) -> (105, 95) projected
  line L87 (105, 95) -> (105, 105) projected
  line L88 (174.6985, 62.6274) -> (167.6274, 69.6985) projected
  line L89 (167.6274, 69.6985) -> (178.234, 80.3051) projected
  line L90 (178.234, 80.3051) -> (185.3051, 73.234) projected
  line L91 (185.3051, 73.234) -> (174.6985, 62.6274) projected
  line L92 (193.9842, 56.4573) -> (208.1264, 70.5995) projected
  line L93 (208.1264, 70.5995) -> (210.9548, 67.771) projected
  line L94 (210.9548, 67.771) -> (196.8127, 53.6289) projected
  line L95 (196.8127, 53.6289) -> (193.9842, 56.4573) projected
  line L96 (145, 88) -> (125, 88) projected
  line L97 (125, 88) -> (125, 92) projected
  line L98 (125, 92) -> (145, 92) projected
  line L99 (145, 92) -> (145, 88) projected
  line L100 (158.6289, 91.8127) -> (172.771, 105.9548) projected
  line L101 (172.771, 105.9548) -> (175.5995, 103.1264) projected
  line L102 (175.5995, 103.1264) -> (161.4573, 88.9842) projected
  line L103 (161.4573, 88.9842) -> (158.6289, 91.8127) projected
  line L104 (155.0932, 62.4337) -> (157.9217, 65.2621) projected
  line L105 (157.9217, 65.2621) -> (172.0638, 51.12) projected
  line L106 (172.0638, 51.12) -> (169.2354, 48.2915) projected
  line L107 (169.2354, 48.2915) -> (155.0932, 62.4337) projected
  line L108 (136.7086, 64.2355) -> (122.5665, 50.0934) projected
  line L109 (122.5665, 50.0934) -> (119.738, 52.9218) projected
  line L110 (119.738, 52.9218) -> (133.8802, 67.0639) projected
  line L111 (133.8802, 67.0639) -> (136.7086, 64.2355) projected
  circle A36 centre (205, 58.9878) radius 1.5 projected
  circle A37 centre (184.4939, 79.4939) radius 1.5 projected
  circle A38 centre (163.9878, 100) radius 1.5 projected
  circle A39 centre (95, 100) radius 1.5 projected
  circle A40 centre (112, 85) radius 1.5 projected
  circle A41 centre (166.8162, 61.8162) radius 1.5 projected
  circle A42 centre (146.3101, 82.3223) radius 1.5 projected
  circle A43 centre (135, 100) radius 1.5 projected
  circle A44 centre (205, 50) radius 1.5 projected
  circle A45 centre (121, 85) radius 1.5 projected
  circle A46 centre (123.9878, 60) radius 1.5 projected
  circle A47 centre (190.4428, 45) radius 1.5 projected
  circle A48 centre (145, 40) radius 1.5 projected
  circle A49 centre (5, 40) radius 1.5 projected
  arc A50 (178.1142, -40) -> (75, -26.5) centre (73.8668, -435.7032) ccw projected
  arc A51 (225, 6.8858) -> (178.1142, -40) centre (305, -120) ccw projected
  line L112 (225, 6.8858) -> (225, 73.1142) projected
  arc A52 (178.1142, 120) -> (225, 73.1142) centre (305, 200) ccw projected
  arc A53 (75, 106.5) -> (178.1142, 120) centre (73.8668, 515.7032) ccw projected
  arc A54 (-28.1142, 120) -> (75, 106.5) centre (76.1332, 515.7032) ccw projected
  arc A55 (-75, 73.1142) -> (-28.1142, 120) centre (-155, 200) ccw projected
  line L113 (-75, 73.1142) -> (-75, 6.8858) projected
  arc A56 (-28.1142, -40) -> (-75, 6.8858) centre (-155, -120) ccw projected
  arc A57 (75, -26.5) -> (-28.1142, -40) centre (76.1332, -435.7032) ccw projected
  line L114 (35, 30) -> (35, 50) projected
  line L115 (35, 50) -> (31, 50) projected
  line L116 (31, 50) -> (31, 70) projected
  line L117 (31, 70) -> (35, 70) projected
  line L118 (35, 70) -> (35, 55) projected
  line L119 (35, 55) -> (40, 55) projected
  line L120 (40, 55) -> (40, 80) projected
  line L121 (40, 80) -> (50, 80) projected
  line L122 (50, 80) -> (50, 88) projected
  line L123 (50, 88) -> (45, 88) projected
  line L124 (45, 88) -> (45, 92) projected
  line L125 (45, 92) -> (65, 92) projected
  line L126 (65, 92) -> (65, 88) projected
  line L127 (65, 88) -> (85, 88) projected
  line L128 (85, 88) -> (85, 92) projected
  line L129 (85, 92) -> (105, 92) projected
  line L130 (105, 92) -> (105, 88) projected
  line L131 (105, 88) -> (100, 88) projected
  line L132 (100, 88) -> (100, 80) projected
  line L133 (100, 80) -> (110, 80) projected
  line L134 (110, 80) -> (110, 55) projected
  line L135 (110, 55) -> (115, 55) projected
  line L136 (115, 55) -> (115, 70) projected
  line L137 (115, 70) -> (119, 70) projected
  line L138 (119, 70) -> (119, 50) projected
  line L139 (119, 50) -> (115, 50) projected
  line L140 (115, 50) -> (115, 30) projected
  line L141 (115, 30) -> (119, 30) projected
  line L142 (119, 30) -> (119, 10) projected
  line L143 (119, 10) -> (115, 10) projected
  line L144 (115, 10) -> (115, 25) projected
  line L145 (115, 25) -> (110, 25) projected
  line L146 (110, 25) -> (110, 0) projected
  line L147 (110, 0) -> (100, 0) projected
  line L148 (100, 0) -> (100, -8) projected
  line L149 (100, -8) -> (105, -8) projected
  line L150 (105, -8) -> (105, -12) projected
  line L151 (105, -12) -> (85, -12) projected
  line L152 (85, -12) -> (85, -8) projected
  line L153 (85, -8) -> (65, -8) projected
  line L154 (65, -8) -> (65, -12) projected
  line L155 (65, -12) -> (45, -12) projected
  line L156 (45, -12) -> (45, -8) projected
  line L157 (45, -8) -> (50, -8) projected
  line L158 (50, -8) -> (50, 0) projected
  line L159 (50, 0) -> (40, 0) projected
  line L160 (40, 0) -> (40, 25) projected
  line L161 (40, 25) -> (35, 25) projected
  line L162 (35, 25) -> (35, 10) projected
  line L163 (35, 10) -> (31, 10) projected
  line L164 (31, 10) -> (31, 30) projected
  line L165 (31, 30) -> (35, 30) projected
  line L166 (-155, 200) -> (305, 200)
  line L167 (305, 200) -> (305, -120)
  line L168 (305, -120) -> (-155, -120)
  line L169 (-155, -120) -> (-155, 200)
  point P0 (0, 0)
extrude "RemoveBase" cut sketch "Sketch19" against normal through all contours A50 A57 A56 L113 A55 A54 A53 A52 L112 A51
sketch "Sketch20" plane through (0, 0, 7) normal (0, 0, 1) x (1, 0, 0)
  circle A0 centre (75, 40) radius 11 projected
  circle A1 centre (75, 40) radius 11
  point P0 (0, 0)
extrude "OffsetCenterHole" cut sketch "Sketch20" against normal through all
sketch "Sketch21" plane through (0, 0, 7) normal (0, 0, 1) x (1, 0, 0)
  line L0 (115, 55) -> (115, 25) projected
  line L1 (100, 55) -> (115, 55) projected
  line L2 (100, 88) -> (100, 55) projected
  line L3 (50, 88) -> (100, 88) projected
  line L4 (50, 55) -> (50, 88) projected
  line L5 (35, 55) -> (50, 55) projected
  line L6 (35, 25) -> (35, 55) projected
  line L7 (50, 25) -> (35, 25) projected
  line L8 (50, -8) -> (50, 25) projected
  line L9 (100, -8) -> (50, -8) projected
  line L10 (100, 25) -> (100, -8) projected
  line L11 (115, 25) -> (100, 25) projected
  line L12 (99.5, 87.5) -> (99.5, 54.5)
  line L13 (99.5, 54.5) -> (114.5, 54.5)
  line L14 (114.5, 54.5) -> (114.5, 25.5)
  line L15 (114.5, 25.5) -> (99.5, 25.5)
  line L16 (99.5, 25.5) -> (99.5, -7.5)
  line L17 (99.5, -7.5) -> (50.5, -7.5)
  line L18 (50.5, -7.5) -> (50.5, 25.5)
  line L19 (50.5, 25.5) -> (35.5, 25.5)
  line L20 (35.5, 25.5) -> (35.5, 54.5)
  line L21 (35.5, 54.5) -> (50.5, 54.5)
  line L22 (50.5, 54.5) -> (50.5, 87.5)
  line L23 (50.5, 87.5) -> (99.5, 87.5)
  point P0 (0, 0)
  dimension "d208" = 0.5
extrude "ContourOffset" cut sketch "Sketch21" against normal through all
sketch "Sketch22" plane through (0, 0, 7) normal (0, 0, 1) x (1, 0, 0)
  line L0 (50.5, 54.5) -> (35.5, 54.5) projected
  line L1 (99.5, 54.5) -> (99.5, 87.5) projected
  circle A0 centre (75, 40) radius 11 projected
  circle A1 centre (75, 71.11) radius 1.5 projected
  circle A2 centre (43.89, 40) radius 1.5 projected
  circle A3 centre (49.5, 54.5) radius 1
  line L2 (75, 40) -> (75, 71.11) construction
  line L3 (75, 40) -> (43.89, 40) construction
  circle A4 centre (49.5, 25.5) radius 1
  circle A5 centre (100.5, 54.5) radius 1
  circle A6 centre (100.5, 25.5) radius 1
  point P0 (0, 0)
  point P1 (106.11, 40)
  dimension "d211" = 2
extrude "MillCutouts" cut sketch "Sketch22" against normal through all contours A3 L0 | L0 A3 | A4 | A5 | A6
properties part number "Centerboard"
